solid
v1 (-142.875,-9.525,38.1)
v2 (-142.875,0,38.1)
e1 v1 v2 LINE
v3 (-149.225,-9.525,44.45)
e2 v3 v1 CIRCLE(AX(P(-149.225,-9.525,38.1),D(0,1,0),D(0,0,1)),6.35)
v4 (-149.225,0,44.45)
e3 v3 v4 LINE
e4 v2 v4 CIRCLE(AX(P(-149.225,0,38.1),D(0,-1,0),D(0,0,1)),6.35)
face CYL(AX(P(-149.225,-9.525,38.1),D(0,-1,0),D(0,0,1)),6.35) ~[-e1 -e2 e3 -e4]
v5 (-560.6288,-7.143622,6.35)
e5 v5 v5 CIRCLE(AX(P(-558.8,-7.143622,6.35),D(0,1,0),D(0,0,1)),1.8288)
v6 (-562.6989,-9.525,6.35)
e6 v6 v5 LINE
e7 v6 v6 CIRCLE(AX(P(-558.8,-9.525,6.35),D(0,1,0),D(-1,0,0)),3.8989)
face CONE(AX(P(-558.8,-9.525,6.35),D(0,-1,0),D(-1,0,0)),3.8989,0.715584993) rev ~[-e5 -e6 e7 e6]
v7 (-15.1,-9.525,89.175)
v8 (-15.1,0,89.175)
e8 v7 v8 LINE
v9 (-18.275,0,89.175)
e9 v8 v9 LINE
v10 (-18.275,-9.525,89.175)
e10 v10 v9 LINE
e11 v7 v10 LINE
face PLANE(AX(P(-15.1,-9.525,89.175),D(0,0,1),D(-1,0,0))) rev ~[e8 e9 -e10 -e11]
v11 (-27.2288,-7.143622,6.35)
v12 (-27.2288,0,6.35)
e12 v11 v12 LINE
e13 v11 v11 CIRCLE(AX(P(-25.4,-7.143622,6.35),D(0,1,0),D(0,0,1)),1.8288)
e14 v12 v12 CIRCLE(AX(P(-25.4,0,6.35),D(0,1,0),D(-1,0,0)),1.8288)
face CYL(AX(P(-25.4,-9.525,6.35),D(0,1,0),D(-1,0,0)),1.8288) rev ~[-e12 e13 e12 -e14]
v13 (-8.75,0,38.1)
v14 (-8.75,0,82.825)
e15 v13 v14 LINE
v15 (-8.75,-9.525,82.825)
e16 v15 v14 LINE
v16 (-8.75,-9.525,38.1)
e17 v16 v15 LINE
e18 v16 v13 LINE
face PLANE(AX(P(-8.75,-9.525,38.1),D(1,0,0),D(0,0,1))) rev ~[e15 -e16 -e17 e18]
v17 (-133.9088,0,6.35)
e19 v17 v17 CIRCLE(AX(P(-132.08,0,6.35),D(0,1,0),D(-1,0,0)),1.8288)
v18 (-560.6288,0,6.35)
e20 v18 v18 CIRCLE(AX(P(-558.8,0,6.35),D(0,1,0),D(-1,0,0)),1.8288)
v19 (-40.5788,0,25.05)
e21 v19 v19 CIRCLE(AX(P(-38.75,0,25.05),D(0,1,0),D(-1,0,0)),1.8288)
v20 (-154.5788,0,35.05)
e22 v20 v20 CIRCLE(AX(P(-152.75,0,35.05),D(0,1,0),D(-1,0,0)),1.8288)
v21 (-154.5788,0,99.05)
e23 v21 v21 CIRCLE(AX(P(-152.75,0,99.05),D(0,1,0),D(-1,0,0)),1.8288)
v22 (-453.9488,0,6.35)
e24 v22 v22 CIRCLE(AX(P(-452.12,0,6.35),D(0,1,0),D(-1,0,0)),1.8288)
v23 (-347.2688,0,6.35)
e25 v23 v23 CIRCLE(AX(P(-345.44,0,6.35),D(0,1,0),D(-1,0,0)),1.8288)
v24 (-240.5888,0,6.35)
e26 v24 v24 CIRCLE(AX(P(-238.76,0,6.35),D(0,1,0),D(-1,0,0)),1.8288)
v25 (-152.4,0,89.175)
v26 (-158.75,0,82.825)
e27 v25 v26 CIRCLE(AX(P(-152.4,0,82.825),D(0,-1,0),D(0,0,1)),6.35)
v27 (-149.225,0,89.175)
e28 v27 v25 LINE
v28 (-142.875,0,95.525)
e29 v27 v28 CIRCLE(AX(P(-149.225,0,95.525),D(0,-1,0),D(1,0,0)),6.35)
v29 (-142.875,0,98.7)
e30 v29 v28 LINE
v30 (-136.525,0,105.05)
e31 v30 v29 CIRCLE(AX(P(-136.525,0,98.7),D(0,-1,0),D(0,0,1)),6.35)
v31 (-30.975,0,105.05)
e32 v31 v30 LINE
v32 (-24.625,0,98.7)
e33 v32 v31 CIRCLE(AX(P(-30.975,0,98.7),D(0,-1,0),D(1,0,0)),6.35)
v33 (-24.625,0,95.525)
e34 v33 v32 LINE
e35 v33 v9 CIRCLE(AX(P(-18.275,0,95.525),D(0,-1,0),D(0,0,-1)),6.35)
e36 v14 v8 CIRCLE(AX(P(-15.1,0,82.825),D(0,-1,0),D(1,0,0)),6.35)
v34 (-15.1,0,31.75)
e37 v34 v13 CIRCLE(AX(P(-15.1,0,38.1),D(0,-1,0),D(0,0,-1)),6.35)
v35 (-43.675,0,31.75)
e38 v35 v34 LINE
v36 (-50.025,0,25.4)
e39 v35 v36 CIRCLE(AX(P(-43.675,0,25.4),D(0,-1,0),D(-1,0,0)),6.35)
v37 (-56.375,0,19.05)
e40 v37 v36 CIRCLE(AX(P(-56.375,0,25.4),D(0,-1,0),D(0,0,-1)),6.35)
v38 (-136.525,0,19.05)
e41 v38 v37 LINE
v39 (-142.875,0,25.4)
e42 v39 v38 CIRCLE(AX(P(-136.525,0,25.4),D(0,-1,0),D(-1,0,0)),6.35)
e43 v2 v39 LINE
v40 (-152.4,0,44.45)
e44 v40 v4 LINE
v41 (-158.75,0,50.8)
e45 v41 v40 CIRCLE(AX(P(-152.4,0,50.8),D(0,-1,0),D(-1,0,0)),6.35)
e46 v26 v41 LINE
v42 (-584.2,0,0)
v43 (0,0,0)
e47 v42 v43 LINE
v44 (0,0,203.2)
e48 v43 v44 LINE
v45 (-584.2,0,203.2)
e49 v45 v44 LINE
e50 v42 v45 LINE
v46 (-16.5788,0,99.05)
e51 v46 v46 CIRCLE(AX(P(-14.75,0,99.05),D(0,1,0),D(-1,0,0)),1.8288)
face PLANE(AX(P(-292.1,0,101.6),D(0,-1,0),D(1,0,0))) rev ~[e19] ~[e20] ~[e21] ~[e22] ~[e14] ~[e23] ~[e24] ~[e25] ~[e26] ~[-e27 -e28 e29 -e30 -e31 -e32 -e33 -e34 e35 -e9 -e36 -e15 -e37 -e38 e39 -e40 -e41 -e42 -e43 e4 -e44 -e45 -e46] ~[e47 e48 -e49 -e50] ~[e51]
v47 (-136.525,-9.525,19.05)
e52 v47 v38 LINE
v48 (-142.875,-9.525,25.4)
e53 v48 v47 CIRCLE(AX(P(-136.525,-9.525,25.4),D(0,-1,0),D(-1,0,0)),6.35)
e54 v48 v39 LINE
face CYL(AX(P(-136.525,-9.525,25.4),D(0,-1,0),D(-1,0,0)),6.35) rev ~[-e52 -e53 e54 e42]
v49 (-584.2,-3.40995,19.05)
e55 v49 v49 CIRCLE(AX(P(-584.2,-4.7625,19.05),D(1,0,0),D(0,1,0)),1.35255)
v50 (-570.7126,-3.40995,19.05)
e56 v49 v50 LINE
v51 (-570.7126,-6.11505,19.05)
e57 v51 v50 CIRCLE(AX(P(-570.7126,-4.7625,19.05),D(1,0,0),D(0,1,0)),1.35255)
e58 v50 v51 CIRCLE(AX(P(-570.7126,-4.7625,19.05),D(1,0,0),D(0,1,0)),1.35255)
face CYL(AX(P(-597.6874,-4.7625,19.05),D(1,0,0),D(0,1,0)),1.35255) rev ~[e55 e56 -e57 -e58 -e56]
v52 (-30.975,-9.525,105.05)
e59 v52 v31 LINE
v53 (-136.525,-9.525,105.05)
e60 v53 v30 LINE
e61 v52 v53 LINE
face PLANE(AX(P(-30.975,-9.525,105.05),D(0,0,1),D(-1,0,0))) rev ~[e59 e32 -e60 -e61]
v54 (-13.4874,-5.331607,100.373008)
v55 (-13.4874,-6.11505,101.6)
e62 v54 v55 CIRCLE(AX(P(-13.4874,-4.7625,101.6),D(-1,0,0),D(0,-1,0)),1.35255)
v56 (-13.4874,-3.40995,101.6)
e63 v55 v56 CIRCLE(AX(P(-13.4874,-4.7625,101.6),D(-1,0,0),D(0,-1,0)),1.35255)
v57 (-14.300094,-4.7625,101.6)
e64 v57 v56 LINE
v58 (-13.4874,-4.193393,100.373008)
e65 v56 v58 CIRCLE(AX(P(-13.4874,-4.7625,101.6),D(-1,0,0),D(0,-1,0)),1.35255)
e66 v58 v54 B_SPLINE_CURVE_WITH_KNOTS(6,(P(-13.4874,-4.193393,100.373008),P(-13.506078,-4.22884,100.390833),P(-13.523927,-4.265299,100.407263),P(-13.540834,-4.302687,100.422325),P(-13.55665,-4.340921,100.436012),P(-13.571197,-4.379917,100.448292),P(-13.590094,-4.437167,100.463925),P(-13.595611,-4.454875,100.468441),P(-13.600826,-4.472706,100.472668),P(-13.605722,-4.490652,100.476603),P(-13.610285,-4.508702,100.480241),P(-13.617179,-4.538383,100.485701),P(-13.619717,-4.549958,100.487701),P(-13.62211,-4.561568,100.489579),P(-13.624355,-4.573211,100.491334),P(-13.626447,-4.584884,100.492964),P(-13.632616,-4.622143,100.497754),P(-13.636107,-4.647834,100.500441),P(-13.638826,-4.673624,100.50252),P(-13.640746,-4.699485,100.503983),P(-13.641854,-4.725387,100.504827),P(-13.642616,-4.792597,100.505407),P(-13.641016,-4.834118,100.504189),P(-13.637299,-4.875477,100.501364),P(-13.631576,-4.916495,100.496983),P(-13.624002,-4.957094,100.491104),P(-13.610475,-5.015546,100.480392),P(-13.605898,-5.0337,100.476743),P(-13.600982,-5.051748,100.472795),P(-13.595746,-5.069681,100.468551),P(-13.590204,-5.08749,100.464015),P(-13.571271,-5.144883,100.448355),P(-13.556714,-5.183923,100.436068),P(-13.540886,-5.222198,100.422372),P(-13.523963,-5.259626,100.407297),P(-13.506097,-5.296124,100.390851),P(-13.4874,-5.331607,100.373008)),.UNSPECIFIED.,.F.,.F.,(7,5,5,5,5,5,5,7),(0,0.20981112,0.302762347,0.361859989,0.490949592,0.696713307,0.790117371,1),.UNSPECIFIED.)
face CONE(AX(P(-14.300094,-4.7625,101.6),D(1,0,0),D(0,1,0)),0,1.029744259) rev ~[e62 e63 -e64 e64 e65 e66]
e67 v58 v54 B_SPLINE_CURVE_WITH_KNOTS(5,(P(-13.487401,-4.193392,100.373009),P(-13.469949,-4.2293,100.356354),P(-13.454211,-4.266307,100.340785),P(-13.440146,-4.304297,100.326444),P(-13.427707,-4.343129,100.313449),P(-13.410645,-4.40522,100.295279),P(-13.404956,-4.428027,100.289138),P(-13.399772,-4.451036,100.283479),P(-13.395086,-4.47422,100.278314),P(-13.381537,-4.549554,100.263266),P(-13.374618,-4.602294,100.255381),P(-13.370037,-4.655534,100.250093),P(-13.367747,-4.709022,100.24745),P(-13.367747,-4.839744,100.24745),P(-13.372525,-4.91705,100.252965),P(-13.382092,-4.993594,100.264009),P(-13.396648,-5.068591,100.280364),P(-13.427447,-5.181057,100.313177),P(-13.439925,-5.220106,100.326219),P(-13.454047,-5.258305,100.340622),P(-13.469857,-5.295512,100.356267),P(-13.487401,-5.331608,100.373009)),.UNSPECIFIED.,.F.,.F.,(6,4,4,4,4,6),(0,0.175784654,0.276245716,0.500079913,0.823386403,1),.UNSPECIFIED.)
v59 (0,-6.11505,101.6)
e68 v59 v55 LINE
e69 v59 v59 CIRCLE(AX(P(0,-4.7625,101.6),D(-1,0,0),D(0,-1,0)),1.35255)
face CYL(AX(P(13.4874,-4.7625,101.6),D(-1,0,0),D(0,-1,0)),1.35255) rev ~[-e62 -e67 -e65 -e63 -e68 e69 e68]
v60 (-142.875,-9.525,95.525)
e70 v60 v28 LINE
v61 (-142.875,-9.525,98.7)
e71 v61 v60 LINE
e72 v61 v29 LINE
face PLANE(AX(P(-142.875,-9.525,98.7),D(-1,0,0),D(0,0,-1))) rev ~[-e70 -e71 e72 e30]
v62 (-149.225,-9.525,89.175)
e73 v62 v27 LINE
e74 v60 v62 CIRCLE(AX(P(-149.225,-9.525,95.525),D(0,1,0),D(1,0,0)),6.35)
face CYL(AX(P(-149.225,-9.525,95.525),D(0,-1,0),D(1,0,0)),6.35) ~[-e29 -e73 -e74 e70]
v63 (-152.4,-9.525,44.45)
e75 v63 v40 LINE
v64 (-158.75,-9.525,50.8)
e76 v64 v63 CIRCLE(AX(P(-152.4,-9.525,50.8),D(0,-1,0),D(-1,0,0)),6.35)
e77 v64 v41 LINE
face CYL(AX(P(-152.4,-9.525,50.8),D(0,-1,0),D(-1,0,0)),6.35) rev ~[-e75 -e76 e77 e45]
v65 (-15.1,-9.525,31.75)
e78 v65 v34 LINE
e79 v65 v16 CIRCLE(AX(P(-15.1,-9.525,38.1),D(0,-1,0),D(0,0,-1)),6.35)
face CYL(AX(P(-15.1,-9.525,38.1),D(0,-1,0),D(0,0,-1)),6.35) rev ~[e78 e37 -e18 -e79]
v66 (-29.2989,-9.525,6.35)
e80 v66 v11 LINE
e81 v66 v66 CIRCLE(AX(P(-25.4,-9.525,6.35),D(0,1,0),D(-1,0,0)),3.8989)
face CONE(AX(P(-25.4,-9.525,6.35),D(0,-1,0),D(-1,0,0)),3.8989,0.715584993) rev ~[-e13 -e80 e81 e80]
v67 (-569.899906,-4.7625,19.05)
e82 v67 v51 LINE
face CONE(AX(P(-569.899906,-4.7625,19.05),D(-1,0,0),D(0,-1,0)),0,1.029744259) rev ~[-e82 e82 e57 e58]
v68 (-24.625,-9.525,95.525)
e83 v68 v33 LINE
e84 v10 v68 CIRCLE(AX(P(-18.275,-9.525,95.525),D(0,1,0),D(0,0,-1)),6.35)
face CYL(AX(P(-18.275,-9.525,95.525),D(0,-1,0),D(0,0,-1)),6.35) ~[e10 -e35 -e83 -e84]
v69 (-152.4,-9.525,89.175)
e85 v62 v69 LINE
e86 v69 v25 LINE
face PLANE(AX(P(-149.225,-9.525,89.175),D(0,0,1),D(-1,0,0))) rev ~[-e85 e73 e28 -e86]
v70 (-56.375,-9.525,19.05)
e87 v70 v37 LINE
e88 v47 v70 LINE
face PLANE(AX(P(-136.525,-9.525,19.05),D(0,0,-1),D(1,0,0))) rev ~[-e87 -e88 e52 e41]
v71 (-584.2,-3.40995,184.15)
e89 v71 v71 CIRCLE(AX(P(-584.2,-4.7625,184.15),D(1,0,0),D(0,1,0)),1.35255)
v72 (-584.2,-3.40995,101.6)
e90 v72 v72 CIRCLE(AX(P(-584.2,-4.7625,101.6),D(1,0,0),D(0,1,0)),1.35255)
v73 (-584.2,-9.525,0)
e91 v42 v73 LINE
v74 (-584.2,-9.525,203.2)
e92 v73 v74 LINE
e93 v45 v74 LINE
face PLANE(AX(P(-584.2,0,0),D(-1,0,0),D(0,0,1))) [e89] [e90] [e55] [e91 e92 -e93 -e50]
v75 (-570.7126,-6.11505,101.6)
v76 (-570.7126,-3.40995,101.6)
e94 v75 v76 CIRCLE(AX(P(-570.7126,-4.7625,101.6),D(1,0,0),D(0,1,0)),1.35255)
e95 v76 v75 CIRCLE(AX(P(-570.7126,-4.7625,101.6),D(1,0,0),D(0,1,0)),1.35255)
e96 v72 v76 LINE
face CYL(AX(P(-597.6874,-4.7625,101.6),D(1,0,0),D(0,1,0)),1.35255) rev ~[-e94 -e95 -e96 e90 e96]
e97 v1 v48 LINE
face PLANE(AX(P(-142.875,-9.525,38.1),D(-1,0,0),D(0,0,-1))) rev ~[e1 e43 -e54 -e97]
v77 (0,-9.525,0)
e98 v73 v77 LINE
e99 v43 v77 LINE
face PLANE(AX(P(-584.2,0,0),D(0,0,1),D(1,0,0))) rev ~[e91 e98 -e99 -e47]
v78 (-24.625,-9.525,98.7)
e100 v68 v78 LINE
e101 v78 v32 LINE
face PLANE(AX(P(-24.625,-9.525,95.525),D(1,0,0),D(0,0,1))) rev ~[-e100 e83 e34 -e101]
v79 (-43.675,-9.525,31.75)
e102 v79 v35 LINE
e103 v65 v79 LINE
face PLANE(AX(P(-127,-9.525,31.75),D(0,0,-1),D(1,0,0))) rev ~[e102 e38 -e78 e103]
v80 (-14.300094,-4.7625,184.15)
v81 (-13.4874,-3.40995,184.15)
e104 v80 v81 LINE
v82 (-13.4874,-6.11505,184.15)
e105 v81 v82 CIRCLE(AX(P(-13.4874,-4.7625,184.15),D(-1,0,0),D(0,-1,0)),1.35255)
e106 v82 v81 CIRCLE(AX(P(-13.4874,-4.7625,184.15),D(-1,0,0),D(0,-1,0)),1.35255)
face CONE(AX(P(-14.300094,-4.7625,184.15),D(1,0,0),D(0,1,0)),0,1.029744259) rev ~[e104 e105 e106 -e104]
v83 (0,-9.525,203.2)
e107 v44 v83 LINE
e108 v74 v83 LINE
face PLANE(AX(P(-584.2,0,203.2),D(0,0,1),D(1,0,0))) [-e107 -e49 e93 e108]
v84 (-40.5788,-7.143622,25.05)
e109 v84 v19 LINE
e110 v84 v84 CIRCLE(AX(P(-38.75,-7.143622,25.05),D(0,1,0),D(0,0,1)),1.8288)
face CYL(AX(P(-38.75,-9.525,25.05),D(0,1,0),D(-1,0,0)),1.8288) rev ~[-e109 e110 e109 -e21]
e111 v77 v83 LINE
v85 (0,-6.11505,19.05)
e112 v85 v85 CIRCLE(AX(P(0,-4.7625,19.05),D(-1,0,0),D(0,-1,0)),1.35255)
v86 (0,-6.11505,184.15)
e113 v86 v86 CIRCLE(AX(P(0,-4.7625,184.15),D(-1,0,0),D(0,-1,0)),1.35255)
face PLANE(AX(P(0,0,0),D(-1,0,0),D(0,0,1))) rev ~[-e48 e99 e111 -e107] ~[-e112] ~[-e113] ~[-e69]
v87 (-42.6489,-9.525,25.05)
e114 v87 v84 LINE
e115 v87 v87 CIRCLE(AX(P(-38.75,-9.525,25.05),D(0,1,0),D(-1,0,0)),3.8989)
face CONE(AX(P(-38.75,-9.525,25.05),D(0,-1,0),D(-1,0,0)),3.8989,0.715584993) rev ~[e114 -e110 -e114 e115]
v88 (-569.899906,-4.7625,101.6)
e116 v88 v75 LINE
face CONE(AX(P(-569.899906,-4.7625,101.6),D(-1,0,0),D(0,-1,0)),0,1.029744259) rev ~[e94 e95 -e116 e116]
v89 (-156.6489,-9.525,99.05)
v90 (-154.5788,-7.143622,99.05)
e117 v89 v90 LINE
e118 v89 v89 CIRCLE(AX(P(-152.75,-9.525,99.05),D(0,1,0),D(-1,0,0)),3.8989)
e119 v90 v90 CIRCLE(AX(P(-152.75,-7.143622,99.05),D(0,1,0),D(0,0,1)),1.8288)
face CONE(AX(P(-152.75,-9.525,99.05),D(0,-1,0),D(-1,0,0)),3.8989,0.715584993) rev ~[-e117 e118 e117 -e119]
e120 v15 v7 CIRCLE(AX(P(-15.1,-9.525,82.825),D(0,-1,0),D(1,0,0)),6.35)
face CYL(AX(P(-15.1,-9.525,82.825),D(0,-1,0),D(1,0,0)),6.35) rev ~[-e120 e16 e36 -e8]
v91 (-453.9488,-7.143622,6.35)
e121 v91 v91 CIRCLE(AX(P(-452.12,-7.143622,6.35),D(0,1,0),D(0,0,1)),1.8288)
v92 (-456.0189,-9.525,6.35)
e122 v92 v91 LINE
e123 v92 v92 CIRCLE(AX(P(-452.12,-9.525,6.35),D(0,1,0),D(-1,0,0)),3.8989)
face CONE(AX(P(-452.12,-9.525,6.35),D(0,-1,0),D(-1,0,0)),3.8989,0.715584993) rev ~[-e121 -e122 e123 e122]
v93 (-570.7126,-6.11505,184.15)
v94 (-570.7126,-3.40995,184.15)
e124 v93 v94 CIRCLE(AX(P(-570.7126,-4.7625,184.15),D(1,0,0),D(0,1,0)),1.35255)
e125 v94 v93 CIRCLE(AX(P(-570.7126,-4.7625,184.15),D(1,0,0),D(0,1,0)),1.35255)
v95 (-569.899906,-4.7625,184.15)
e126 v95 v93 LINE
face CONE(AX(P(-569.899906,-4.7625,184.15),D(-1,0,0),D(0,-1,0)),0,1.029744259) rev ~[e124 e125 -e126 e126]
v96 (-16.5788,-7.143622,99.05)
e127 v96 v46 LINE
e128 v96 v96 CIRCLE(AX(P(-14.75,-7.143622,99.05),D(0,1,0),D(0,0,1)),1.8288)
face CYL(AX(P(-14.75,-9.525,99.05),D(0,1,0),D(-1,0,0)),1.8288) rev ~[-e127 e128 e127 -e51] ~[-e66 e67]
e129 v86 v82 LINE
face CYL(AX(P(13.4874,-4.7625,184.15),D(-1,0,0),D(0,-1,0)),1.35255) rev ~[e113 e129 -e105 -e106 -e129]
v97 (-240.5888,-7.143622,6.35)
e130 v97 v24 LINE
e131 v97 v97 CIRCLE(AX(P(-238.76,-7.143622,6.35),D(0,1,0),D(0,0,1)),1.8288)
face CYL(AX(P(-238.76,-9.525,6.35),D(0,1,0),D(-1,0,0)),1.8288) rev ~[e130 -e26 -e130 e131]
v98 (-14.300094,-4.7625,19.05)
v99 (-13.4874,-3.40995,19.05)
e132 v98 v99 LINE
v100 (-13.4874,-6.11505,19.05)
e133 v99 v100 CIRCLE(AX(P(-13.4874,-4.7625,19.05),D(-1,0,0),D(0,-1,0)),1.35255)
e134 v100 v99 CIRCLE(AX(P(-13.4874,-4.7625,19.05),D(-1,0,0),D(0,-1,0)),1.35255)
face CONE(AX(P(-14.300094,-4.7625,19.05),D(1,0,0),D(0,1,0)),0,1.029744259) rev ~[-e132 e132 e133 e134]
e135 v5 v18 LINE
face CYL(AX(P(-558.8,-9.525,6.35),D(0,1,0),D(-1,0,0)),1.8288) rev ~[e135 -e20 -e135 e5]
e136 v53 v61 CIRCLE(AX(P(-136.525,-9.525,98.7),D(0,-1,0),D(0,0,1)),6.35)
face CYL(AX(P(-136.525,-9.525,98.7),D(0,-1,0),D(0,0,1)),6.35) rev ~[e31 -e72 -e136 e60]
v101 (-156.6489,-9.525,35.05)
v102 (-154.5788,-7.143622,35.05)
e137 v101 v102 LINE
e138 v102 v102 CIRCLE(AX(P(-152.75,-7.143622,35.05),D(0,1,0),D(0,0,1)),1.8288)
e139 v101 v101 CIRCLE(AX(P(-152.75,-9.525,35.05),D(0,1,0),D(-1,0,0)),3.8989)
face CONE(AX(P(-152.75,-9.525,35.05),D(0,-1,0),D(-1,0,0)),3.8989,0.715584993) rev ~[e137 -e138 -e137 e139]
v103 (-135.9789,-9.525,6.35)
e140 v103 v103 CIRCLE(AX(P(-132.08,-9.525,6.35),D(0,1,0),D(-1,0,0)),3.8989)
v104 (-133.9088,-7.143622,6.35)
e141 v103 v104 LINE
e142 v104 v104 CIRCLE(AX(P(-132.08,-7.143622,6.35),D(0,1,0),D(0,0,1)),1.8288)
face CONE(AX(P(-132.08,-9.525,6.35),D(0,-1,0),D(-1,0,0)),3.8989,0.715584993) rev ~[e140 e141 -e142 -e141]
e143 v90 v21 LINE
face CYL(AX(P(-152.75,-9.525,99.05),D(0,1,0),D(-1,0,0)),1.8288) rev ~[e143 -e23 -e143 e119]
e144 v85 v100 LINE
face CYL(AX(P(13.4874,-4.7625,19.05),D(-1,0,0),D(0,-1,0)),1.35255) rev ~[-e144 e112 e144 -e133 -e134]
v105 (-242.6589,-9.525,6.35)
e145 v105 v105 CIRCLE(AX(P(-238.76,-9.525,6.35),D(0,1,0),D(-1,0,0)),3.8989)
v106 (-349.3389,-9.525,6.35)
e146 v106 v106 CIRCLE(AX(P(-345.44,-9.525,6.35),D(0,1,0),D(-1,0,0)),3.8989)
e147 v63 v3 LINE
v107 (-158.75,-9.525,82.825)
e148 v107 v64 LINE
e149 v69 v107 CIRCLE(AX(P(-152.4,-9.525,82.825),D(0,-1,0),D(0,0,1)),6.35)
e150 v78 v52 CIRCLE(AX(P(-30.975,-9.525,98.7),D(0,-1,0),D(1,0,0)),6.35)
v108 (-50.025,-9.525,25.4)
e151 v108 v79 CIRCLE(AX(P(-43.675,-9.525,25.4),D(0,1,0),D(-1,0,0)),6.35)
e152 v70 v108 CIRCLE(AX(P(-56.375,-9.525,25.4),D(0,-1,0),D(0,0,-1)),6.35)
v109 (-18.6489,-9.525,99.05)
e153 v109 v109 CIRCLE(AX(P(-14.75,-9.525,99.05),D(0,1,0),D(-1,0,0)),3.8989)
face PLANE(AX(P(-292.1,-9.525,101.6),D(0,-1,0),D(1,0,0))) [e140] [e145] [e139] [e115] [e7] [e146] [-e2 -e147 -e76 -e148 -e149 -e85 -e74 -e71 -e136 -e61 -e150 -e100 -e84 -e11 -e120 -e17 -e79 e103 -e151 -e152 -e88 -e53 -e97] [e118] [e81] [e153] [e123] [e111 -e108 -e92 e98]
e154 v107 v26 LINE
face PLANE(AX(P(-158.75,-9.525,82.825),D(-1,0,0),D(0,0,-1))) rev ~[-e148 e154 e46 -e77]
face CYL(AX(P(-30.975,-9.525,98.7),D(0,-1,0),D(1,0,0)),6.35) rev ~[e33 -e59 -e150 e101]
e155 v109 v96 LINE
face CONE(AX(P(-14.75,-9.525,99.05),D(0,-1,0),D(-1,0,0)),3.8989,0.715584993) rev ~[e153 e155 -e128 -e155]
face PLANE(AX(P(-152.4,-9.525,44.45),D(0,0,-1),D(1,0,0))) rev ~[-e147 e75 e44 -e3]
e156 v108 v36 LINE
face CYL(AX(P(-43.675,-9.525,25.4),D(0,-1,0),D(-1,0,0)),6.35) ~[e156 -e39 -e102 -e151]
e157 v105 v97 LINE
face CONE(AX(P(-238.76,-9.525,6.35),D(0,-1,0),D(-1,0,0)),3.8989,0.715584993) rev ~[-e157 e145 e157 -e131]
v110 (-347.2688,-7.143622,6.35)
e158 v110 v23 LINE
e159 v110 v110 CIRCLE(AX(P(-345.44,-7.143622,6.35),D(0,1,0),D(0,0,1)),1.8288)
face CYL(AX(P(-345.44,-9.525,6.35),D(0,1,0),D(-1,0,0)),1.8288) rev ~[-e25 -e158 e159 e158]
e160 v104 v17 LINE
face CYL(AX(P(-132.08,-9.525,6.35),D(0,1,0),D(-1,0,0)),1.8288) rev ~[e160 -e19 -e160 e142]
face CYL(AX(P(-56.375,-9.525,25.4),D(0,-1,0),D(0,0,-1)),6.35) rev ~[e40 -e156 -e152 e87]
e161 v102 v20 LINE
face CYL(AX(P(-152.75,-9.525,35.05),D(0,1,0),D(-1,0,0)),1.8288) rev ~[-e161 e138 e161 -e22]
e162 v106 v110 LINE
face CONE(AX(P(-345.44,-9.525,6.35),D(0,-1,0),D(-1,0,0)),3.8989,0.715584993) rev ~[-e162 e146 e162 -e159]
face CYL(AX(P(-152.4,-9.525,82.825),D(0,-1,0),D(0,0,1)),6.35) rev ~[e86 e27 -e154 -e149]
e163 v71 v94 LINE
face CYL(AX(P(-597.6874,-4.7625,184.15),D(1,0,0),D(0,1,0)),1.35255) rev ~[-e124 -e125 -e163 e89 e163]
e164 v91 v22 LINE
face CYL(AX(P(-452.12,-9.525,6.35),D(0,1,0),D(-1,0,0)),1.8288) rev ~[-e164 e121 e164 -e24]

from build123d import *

# Parameters (mm, degrees)
F0_W           = 584.2
F0_H           = 203.2
F1_DEPTH       = 9.525
F3_D           = 3.6576
F3_DEPTH       = 10.3124
F3_CSINK_D     = 7.7978
F3_CSINK_ANGLE = 82
F3_TIP         = 1.0988539001
F4_W           = 101.6
F4_H           = 69.85
F5_DEPTH       = 9.526
F6_DEPTH       = 25.4
F9_D           = 2.7051
F9_DEPTH       = 13.4874
F9_TIP         = 0.8126940303
F9_ON_F7_D     = 2.7051
F9_ON_F7_DEPTH = 13.4874
F9_ON_F7_TIP   = 0.8126940303


# Not quite as in the source:
# - a feature names something its author has since deleted; it is built from what else it names


with BuildPart() as f1:
    # F0 (on Front) → F1 (new body)
    with BuildSketch(Plane.XZ):
        with Locations((-292.1, 101.6)):
            Rectangle(F0_W, F0_H)
    extrude(amount=F1_DEPTH)

    # F3
    with Locations(Plane.XZ.offset(9.525)):
        with Locations((-238.76, 6.35), (-25.4, 6.35), (-345.44, 6.35), (-558.8, 6.35), (-132.08, 6.35), (-452.12, 6.35), (-152.75, 99.05), (-152.75, 35.05), (-38.75, 25.05), (-14.75, 99.05)):
            CounterSinkHole(F3_D / 2, F3_CSINK_D / 2, depth=F3_DEPTH, counter_sink_angle=F3_CSINK_ANGLE)
            with Locations((0, 0, -(F3_DEPTH + F3_TIP / 2))):  # 118° drill point
                Cone(0, F3_D / 2, F3_TIP, mode=Mode.SUBTRACT)

    # F4 (on face) → F5 (cut, through all)
    with BuildSketch(Plane.XZ.offset(9.525)):
        with Locations((-76.2, 66.675)):
            Rectangle(F4_W, F4_H)
    extrude(amount=-F5_DEPTH, mode=Mode.SUBTRACT)

    # F2 (on face) → F6 (cut)
    with BuildSketch(Plane.XZ.offset(9.525)):
        with BuildLine():
            Line((-30.975, 105.05), (-136.525, 105.05))
            ThreePointArc((-136.525, 105.05), (-141.0151280605, 103.1901280605), (-142.875, 98.7))
            Line((-142.875, 98.7), (-142.875, 95.525))
            ThreePointArc((-142.875, 95.525), (-144.7348719395, 91.0348719395), (-149.225, 89.175))
            Line((-149.225, 89.175), (-152.4, 89.175))
            ThreePointArc((-152.4, 89.175), (-156.8901280605, 87.3151280605), (-158.75, 82.825))
            Line((-158.75, 82.825), (-158.75, 50.8))
            ThreePointArc((-158.75, 50.8), (-156.8901280605, 46.3098719395), (-152.4, 44.45))
            Line((-152.4, 44.45), (-149.225, 44.45))
            ThreePointArc((-149.225, 44.45), (-144.7348719395, 42.5901280605), (-142.875, 38.1))
            Line((-142.875, 38.1), (-142.875, 25.4))
            ThreePointArc((-142.875, 25.4), (-141.0151280605, 20.9098719395), (-136.525, 19.05))
            Line((-136.525, 19.05), (-56.375, 19.05))
            ThreePointArc((-56.375, 19.05), (-51.8848719395, 20.9098719395), (-50.025, 25.4))
            ThreePointArc((-50.025, 25.4), (-48.1651280605, 29.8901280605), (-43.675, 31.75))
            Line((-43.675, 31.75), (-15.1, 31.75))
            ThreePointArc((-15.1, 31.75), (-10.6098719395, 33.6098719395), (-8.75, 38.1))
            Line((-8.75, 38.1), (-8.75, 82.825))
            ThreePointArc((-8.75, 82.825), (-10.6098719395, 87.3151280605), (-15.1, 89.175))
            Line((-15.1, 89.175), (-18.275, 89.175))
            ThreePointArc((-18.275, 89.175), (-22.7651280605, 91.0348719395), (-24.625, 95.525))
            Line((-24.625, 95.525), (-24.625, 98.7))
            ThreePointArc((-24.625, 98.7), (-26.4848719395, 103.1901280605), (-30.975, 105.05))
        make_face()
    extrude(amount=-F6_DEPTH, mode=Mode.SUBTRACT)

    # F9
    with Locations(Plane.YZ):
        with Locations((-4.7625, 184.15), (-4.7625, 101.6), (-4.7625, 19.05)):
            Hole(F9_D / 2, depth=F9_DEPTH)
            with Locations((0, 0, -(F9_DEPTH + F9_TIP / 2))):  # 118° drill point
                Cone(0, F9_D / 2, F9_TIP, mode=Mode.SUBTRACT)

    # F9 on F7
    with Locations(Plane(origin=(-584.2, 0, 0), x_dir=(0, -1, 0), z_dir=(-1, 0, 0))):
        with Locations((4.7625, 184.15), (4.7625, 101.6), (4.7625, 19.05)):
            Hole(F9_ON_F7_D / 2, depth=F9_ON_F7_DEPTH)
            with Locations((0, 0, -(F9_ON_F7_DEPTH + F9_ON_F7_TIP / 2))):  # 118° drill point
                Cone(0, F9_ON_F7_D / 2, F9_ON_F7_TIP, mode=Mode.SUBTRACT)


solid = f1.part
